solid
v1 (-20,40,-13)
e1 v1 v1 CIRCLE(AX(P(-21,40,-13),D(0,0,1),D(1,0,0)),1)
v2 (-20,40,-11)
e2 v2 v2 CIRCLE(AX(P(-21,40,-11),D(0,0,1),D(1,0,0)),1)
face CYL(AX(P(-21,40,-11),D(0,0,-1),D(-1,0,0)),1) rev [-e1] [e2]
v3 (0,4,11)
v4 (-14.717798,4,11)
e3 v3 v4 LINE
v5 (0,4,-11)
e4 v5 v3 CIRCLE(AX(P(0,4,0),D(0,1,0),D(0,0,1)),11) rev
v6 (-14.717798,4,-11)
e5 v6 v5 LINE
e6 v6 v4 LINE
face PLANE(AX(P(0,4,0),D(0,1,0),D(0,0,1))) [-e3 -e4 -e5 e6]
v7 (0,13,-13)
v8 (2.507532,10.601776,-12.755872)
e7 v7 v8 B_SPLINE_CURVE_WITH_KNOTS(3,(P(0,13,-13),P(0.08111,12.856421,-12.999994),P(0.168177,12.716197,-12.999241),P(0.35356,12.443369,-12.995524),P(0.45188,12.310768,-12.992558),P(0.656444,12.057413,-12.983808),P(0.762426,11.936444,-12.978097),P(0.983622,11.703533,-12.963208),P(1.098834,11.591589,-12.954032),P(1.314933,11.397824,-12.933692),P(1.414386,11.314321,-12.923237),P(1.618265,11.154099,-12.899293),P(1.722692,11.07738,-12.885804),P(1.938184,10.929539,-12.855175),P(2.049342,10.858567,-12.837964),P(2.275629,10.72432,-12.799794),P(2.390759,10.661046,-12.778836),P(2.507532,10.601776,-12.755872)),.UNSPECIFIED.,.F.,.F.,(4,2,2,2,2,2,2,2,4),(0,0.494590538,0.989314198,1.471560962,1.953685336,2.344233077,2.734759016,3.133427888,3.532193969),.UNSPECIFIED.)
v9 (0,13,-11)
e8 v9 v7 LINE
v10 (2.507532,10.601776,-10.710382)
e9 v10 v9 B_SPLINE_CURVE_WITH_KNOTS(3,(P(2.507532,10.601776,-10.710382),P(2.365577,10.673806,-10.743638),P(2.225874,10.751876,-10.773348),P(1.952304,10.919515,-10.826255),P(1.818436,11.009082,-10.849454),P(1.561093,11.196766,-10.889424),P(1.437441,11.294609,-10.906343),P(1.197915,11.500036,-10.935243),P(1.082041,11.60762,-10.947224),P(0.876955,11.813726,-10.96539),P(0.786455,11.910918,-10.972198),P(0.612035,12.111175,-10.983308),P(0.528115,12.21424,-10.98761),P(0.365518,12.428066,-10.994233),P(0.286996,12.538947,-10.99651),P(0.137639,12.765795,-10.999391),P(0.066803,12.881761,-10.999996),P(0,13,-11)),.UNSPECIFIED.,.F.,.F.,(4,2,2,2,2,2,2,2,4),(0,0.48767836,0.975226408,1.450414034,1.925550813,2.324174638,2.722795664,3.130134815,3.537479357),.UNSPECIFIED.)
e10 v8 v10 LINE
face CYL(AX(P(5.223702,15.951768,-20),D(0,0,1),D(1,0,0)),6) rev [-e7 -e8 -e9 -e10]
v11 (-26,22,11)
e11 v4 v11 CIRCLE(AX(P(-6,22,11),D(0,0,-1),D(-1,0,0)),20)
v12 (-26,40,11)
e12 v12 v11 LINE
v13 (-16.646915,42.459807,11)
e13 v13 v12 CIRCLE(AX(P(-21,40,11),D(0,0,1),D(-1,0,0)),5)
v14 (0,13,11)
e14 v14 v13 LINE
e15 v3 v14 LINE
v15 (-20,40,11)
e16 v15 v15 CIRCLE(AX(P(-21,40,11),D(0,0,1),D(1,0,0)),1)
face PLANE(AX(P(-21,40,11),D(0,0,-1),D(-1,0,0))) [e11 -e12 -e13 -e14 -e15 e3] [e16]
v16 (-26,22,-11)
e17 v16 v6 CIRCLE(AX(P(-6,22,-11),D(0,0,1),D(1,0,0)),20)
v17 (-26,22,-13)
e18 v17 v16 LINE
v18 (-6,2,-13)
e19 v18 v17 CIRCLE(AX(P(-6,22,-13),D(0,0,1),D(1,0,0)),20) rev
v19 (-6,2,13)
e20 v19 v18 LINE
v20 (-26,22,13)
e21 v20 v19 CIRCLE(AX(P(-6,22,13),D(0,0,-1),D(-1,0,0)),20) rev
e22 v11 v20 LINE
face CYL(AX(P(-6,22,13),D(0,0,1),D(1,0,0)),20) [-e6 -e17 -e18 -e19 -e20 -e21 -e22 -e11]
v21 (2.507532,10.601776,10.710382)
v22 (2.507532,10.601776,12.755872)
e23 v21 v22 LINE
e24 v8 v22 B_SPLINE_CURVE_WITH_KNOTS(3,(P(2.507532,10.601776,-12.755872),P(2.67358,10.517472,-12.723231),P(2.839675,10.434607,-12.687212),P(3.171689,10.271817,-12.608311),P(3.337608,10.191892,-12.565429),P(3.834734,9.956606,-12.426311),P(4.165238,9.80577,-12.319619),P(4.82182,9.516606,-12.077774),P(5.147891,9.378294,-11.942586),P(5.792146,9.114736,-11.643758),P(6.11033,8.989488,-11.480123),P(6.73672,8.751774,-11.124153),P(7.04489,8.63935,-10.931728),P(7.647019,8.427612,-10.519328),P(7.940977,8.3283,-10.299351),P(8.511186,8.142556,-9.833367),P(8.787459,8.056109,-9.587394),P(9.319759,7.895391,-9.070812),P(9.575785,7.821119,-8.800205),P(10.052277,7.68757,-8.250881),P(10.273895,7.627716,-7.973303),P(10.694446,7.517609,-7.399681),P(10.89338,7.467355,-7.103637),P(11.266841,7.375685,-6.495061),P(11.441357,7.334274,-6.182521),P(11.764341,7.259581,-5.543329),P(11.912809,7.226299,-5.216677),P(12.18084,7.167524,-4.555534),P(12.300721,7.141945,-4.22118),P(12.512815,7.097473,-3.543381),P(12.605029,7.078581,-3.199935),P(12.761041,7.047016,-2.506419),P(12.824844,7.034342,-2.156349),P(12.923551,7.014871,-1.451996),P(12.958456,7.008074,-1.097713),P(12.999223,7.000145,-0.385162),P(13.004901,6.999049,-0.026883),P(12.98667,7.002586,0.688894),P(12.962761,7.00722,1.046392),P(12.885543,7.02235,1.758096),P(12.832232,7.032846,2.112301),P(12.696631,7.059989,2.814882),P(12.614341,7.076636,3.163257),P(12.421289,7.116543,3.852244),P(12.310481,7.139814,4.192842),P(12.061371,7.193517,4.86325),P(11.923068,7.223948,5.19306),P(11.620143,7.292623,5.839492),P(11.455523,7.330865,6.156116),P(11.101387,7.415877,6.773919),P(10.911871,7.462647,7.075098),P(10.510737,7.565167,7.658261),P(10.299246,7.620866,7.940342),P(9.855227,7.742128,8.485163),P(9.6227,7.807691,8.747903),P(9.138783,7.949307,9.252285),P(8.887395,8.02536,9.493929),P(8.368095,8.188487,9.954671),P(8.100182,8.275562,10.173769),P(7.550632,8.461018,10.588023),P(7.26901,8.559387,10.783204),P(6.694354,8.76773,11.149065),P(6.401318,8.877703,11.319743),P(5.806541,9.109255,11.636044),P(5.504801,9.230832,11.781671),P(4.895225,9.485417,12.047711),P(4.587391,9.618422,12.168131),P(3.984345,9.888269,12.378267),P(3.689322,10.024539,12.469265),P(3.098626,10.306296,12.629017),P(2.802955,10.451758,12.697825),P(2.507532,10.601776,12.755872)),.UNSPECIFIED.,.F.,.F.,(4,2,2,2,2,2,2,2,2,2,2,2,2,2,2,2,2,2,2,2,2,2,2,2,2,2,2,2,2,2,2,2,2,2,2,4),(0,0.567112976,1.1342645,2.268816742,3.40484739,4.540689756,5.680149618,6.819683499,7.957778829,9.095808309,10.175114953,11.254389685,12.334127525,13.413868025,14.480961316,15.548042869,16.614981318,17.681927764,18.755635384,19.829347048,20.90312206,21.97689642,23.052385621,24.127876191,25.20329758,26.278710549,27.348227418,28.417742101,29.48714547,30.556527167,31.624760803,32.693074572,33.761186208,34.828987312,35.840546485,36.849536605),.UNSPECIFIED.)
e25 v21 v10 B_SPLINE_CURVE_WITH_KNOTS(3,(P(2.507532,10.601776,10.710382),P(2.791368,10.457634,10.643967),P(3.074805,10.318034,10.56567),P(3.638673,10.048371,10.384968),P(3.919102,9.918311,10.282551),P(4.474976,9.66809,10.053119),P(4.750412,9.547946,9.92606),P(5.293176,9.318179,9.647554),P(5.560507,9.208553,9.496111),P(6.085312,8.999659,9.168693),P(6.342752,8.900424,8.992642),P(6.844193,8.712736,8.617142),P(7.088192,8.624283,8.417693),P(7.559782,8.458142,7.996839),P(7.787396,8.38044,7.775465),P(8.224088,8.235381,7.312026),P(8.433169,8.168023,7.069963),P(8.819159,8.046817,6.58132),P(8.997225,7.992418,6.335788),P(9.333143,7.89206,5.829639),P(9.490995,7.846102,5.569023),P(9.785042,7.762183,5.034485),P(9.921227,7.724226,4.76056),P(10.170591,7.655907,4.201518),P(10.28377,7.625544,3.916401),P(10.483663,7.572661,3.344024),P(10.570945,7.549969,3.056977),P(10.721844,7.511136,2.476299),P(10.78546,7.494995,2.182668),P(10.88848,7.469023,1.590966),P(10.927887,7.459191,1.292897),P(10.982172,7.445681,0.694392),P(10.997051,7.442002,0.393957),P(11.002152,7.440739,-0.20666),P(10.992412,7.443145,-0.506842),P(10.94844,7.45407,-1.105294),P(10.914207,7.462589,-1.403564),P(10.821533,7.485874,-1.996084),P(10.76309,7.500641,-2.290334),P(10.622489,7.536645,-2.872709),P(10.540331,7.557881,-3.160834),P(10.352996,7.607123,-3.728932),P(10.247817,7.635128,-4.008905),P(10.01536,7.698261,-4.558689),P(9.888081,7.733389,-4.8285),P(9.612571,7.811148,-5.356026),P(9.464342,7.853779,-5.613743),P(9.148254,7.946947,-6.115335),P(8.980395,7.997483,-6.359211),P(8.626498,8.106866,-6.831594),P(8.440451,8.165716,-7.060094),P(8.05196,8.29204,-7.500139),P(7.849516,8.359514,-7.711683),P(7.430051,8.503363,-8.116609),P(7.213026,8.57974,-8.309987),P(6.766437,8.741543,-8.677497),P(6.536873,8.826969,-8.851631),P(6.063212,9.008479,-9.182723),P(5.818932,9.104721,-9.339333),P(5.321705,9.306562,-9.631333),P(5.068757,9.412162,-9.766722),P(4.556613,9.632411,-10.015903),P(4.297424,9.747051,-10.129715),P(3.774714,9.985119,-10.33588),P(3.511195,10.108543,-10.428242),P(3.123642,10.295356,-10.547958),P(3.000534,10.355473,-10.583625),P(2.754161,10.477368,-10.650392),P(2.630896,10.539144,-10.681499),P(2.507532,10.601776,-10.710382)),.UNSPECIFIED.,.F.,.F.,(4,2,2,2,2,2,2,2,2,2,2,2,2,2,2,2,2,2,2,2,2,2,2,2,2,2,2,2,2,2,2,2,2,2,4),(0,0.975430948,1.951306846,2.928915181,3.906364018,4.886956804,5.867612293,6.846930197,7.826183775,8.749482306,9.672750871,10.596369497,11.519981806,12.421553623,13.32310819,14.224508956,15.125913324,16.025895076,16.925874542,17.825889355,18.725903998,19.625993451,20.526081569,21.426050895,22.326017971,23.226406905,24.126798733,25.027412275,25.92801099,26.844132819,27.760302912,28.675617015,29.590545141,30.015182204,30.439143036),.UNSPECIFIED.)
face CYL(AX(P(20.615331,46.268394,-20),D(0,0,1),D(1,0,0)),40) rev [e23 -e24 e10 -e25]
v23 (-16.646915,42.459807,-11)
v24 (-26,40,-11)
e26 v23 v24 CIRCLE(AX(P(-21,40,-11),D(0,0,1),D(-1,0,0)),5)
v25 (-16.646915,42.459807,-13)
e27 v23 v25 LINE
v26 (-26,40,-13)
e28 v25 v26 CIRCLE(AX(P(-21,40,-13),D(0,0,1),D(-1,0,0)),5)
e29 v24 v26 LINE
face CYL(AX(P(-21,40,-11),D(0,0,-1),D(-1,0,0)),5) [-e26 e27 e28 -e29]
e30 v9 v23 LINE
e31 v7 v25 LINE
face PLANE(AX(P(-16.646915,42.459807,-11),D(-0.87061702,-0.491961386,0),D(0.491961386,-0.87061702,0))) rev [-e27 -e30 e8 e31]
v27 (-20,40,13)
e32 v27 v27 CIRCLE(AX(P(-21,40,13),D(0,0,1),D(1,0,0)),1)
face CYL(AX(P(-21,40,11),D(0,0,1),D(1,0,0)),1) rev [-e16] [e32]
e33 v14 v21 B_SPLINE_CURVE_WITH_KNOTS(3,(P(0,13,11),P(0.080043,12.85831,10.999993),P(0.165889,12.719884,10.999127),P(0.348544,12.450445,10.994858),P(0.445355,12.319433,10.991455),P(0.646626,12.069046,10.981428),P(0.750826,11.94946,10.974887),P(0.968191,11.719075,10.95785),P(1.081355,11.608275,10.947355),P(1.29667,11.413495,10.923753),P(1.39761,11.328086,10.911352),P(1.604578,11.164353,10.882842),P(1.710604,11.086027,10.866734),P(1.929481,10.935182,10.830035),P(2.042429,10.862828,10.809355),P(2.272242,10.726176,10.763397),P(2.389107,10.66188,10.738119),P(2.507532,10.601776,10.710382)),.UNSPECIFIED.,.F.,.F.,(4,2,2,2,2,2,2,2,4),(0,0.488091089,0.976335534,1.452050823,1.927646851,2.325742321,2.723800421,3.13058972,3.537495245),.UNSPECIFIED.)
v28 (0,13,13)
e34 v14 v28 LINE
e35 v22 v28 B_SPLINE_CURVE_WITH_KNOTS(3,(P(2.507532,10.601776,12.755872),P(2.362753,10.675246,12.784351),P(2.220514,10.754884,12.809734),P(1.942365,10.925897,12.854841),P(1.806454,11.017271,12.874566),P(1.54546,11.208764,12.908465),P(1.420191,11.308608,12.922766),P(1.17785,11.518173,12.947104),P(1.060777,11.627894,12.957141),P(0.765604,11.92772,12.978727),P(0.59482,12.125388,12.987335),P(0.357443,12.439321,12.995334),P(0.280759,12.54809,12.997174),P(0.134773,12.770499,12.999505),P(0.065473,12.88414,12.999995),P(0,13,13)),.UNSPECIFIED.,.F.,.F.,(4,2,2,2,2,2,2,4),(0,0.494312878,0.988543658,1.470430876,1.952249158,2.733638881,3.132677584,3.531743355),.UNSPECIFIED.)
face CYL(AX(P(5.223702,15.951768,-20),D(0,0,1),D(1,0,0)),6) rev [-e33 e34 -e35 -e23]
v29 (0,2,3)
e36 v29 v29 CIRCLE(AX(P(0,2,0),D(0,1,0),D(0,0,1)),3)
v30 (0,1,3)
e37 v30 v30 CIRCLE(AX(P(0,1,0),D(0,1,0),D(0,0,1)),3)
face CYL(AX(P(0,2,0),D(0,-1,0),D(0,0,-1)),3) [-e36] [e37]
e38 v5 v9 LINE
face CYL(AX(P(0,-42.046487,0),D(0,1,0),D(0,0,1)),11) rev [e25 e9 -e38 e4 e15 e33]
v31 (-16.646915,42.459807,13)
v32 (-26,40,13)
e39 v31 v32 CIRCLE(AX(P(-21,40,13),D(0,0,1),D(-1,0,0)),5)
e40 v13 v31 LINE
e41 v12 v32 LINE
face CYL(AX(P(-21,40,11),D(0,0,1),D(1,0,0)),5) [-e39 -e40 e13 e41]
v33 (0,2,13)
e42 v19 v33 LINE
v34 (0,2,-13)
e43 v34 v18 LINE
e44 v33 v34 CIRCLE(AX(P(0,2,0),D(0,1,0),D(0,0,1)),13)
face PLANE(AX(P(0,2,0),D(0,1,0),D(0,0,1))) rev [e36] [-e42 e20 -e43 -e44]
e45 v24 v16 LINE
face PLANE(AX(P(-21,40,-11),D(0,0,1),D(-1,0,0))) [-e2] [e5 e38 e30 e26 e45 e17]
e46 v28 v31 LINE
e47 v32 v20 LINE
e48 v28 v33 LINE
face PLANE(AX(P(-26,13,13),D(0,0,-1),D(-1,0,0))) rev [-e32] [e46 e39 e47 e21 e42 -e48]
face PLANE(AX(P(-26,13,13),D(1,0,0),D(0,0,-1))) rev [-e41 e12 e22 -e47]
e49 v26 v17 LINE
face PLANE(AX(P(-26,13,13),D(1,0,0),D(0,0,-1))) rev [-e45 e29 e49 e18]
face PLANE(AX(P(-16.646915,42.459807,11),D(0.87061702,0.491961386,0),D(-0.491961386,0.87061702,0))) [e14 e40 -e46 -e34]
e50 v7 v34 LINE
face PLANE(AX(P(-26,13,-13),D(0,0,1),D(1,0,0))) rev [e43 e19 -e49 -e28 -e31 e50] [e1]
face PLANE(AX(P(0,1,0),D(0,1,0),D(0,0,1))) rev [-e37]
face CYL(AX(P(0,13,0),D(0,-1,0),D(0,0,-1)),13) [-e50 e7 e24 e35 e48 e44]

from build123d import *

# Parameters (mm, degrees)
SKETCH_1_R          = 2.15
EXTRUDE_1_DEPTH     = 1
EXTRUDE_2_DEPTH     = 12
SKETCH_8_R          = 1
EXTRUDE_4_DEPTH     = 2
CUT_EXTRUDE_1_DEPTH = 9
CUT_EXTRUDE_2_DEPTH = 20
SKETCH_12_R         = 3
CUT_EXTRUDE_3_DEPTH = 1
FILLET_1_R          = 20
SKETCH_13_W         = 60
SKETCH_13_H         = 50
CUT_EXTRUDE_4_DEPTH = 1


with BuildPart() as part:
    # 草图1 → 凸台-拉伸1 (new body)
    with BuildSketch(Plane(origin=(0, 0, 0), x_dir=(1, 0, 0), z_dir=(0, 1, 0))):
        with BuildLine():
            Line((-24, -22.5), (24, -22.5))
            ThreePointArc((24, -22.5), (26.828427125, -21.328427125), (28, -18.5))
            Line((28, -18.5), (28, 18.5))
            ThreePointArc((28, 18.5), (26.828427125, 21.328427125), (24, 22.5))
            Line((24, 22.5), (-24, 22.5))
            ThreePointArc((-24, 22.5), (-26.828427125, 21.328427125), (-28, 18.5))
            Line((-28, 18.5), (-28, -18.5))
            ThreePointArc((-28, -18.5), (-26.828427125, -21.328427125), (-24, -22.5))
        make_face()
        with Locations(Location((-23, 17.5, 0), (0, 0, 270))):
            Circle(SKETCH_1_R, mode=Mode.SUBTRACT)
        with Locations(Location((-23, -17.5, 0), (0, 0, 270))):
            Circle(SKETCH_1_R, mode=Mode.SUBTRACT)
        with Locations(Location((23, -17.5, 0), (0, 0, 270))):
            Circle(SKETCH_1_R, mode=Mode.SUBTRACT)
        with Locations(Location((23, 17.5, 0), (0, 0, 270))):
            Circle(SKETCH_1_R, mode=Mode.SUBTRACT)
    extrude(amount=EXTRUDE_1_DEPTH)

    # 草图3 → 凸台-拉伸2 (add)
    with BuildSketch(Plane(origin=(0, 1, 0), x_dir=(1, 0, 0), z_dir=(0, 1, 0))):
        with BuildLine():
            Line((-26, -13), (-26, 13))
            Line((-26, 13), (0, 13))
            ThreePointArc((0, 13), (13, 0), (0, -13))
            Line((0, -13), (-26, -13))
        make_face()
    extrude(amount=EXTRUDE_2_DEPTH)

    # 草图8 → 凸台-拉伸4 (add)
    with BuildSketch(Plane.XY.offset(13)):
        with BuildLine():
            Line((-26, 13), (-26, 40))
            ThreePointArc((-26, 40), (-22.271726092, 44.835567469), (-16.646914902, 42.459806928))
            Line((-16.646914902, 42.459806928), (0, 13))
            Line((0, 13), (-26, 13))
        make_face()
        with Locations((-21, 40)):
            Circle(SKETCH_8_R, mode=Mode.SUBTRACT)
    extrude_4 = extrude(amount=-EXTRUDE_4_DEPTH)

    # 镜向1: 凸台-拉伸4 across plane
    add(extrude_4.mirror(Plane.XY))

    # 草图9 → 切除-拉伸1 (cut)
    with BuildSketch(Plane(origin=(0, 13, 0), x_dir=(1, 0, 0), z_dir=(0, 1, 0))):
        with BuildLine():
            Line((-26, 11), (-26, -11))
            Line((-26, -11), (0, -11))
            ThreePointArc((0, -11), (11, 0), (0, 11))
            Line((0, 11), (-26, 11))
        make_face()
    extrude(amount=-CUT_EXTRUDE_1_DEPTH, mode=Mode.SUBTRACT)

    # 草图11 → 切除-拉伸2 (cut, symmetric)
    with BuildSketch(Plane.XY):
        with BuildLine():
            Line((0, 13), (13, 13))
            Line((13, 13), (13, 7))
            ThreePointArc((13, 7), (7.628297221, 8.43537945), (2.507532378, 10.601775609))
            ThreePointArc((2.507532378, 10.601775609), (1.076623467, 11.615671145), (0, 13))
        make_face()
    extrude(amount=CUT_EXTRUDE_2_DEPTH, both=True, mode=Mode.SUBTRACT)

    # 草图12 → 切除-拉伸3 (cut)
    with BuildSketch(Plane(origin=(0, 1, 0), x_dir=(1, 0, 0), z_dir=(0, 1, 0))):
        with BuildLine():
            Line((-26, -13), (0, -13))
            ThreePointArc((0, -13), (13, 0), (0, 13))
            Line((0, 13), (-26, 13))
            Line((-26, 13), (-26, -13))
        make_face()
        with Locations(Location((0, 0, 0), (0, 0, 270))):
            Circle(SKETCH_12_R, mode=Mode.SUBTRACT)
    extrude(amount=CUT_EXTRUDE_3_DEPTH, mode=Mode.SUBTRACT)

    # 圆角1
    # the kernel refuses this fillet: 20 mm, written as the material it takes off along each edge
    with BuildSketch(Plane(origin=(-26, 2, -63), x_dir=(1, 0, 0), z_dir=(0, 0, 1))) as fillet_1_piece_1:
        with BuildLine():
            CenterArc((FILLET_1_R, FILLET_1_R), FILLET_1_R, 180, 90)
            Line((0, FILLET_1_R), (0, 0))
            Line((0, 0), (FILLET_1_R, 0))
        make_face()
    extrude(amount=126, mode=Mode.SUBTRACT)

    # 草图13 → 切除-拉伸4 (cut)
    with BuildSketch(Plane.XZ):
        Rectangle(SKETCH_13_W, SKETCH_13_H)
    extrude(amount=-CUT_EXTRUDE_4_DEPTH, mode=Mode.SUBTRACT)


solid = part.part
